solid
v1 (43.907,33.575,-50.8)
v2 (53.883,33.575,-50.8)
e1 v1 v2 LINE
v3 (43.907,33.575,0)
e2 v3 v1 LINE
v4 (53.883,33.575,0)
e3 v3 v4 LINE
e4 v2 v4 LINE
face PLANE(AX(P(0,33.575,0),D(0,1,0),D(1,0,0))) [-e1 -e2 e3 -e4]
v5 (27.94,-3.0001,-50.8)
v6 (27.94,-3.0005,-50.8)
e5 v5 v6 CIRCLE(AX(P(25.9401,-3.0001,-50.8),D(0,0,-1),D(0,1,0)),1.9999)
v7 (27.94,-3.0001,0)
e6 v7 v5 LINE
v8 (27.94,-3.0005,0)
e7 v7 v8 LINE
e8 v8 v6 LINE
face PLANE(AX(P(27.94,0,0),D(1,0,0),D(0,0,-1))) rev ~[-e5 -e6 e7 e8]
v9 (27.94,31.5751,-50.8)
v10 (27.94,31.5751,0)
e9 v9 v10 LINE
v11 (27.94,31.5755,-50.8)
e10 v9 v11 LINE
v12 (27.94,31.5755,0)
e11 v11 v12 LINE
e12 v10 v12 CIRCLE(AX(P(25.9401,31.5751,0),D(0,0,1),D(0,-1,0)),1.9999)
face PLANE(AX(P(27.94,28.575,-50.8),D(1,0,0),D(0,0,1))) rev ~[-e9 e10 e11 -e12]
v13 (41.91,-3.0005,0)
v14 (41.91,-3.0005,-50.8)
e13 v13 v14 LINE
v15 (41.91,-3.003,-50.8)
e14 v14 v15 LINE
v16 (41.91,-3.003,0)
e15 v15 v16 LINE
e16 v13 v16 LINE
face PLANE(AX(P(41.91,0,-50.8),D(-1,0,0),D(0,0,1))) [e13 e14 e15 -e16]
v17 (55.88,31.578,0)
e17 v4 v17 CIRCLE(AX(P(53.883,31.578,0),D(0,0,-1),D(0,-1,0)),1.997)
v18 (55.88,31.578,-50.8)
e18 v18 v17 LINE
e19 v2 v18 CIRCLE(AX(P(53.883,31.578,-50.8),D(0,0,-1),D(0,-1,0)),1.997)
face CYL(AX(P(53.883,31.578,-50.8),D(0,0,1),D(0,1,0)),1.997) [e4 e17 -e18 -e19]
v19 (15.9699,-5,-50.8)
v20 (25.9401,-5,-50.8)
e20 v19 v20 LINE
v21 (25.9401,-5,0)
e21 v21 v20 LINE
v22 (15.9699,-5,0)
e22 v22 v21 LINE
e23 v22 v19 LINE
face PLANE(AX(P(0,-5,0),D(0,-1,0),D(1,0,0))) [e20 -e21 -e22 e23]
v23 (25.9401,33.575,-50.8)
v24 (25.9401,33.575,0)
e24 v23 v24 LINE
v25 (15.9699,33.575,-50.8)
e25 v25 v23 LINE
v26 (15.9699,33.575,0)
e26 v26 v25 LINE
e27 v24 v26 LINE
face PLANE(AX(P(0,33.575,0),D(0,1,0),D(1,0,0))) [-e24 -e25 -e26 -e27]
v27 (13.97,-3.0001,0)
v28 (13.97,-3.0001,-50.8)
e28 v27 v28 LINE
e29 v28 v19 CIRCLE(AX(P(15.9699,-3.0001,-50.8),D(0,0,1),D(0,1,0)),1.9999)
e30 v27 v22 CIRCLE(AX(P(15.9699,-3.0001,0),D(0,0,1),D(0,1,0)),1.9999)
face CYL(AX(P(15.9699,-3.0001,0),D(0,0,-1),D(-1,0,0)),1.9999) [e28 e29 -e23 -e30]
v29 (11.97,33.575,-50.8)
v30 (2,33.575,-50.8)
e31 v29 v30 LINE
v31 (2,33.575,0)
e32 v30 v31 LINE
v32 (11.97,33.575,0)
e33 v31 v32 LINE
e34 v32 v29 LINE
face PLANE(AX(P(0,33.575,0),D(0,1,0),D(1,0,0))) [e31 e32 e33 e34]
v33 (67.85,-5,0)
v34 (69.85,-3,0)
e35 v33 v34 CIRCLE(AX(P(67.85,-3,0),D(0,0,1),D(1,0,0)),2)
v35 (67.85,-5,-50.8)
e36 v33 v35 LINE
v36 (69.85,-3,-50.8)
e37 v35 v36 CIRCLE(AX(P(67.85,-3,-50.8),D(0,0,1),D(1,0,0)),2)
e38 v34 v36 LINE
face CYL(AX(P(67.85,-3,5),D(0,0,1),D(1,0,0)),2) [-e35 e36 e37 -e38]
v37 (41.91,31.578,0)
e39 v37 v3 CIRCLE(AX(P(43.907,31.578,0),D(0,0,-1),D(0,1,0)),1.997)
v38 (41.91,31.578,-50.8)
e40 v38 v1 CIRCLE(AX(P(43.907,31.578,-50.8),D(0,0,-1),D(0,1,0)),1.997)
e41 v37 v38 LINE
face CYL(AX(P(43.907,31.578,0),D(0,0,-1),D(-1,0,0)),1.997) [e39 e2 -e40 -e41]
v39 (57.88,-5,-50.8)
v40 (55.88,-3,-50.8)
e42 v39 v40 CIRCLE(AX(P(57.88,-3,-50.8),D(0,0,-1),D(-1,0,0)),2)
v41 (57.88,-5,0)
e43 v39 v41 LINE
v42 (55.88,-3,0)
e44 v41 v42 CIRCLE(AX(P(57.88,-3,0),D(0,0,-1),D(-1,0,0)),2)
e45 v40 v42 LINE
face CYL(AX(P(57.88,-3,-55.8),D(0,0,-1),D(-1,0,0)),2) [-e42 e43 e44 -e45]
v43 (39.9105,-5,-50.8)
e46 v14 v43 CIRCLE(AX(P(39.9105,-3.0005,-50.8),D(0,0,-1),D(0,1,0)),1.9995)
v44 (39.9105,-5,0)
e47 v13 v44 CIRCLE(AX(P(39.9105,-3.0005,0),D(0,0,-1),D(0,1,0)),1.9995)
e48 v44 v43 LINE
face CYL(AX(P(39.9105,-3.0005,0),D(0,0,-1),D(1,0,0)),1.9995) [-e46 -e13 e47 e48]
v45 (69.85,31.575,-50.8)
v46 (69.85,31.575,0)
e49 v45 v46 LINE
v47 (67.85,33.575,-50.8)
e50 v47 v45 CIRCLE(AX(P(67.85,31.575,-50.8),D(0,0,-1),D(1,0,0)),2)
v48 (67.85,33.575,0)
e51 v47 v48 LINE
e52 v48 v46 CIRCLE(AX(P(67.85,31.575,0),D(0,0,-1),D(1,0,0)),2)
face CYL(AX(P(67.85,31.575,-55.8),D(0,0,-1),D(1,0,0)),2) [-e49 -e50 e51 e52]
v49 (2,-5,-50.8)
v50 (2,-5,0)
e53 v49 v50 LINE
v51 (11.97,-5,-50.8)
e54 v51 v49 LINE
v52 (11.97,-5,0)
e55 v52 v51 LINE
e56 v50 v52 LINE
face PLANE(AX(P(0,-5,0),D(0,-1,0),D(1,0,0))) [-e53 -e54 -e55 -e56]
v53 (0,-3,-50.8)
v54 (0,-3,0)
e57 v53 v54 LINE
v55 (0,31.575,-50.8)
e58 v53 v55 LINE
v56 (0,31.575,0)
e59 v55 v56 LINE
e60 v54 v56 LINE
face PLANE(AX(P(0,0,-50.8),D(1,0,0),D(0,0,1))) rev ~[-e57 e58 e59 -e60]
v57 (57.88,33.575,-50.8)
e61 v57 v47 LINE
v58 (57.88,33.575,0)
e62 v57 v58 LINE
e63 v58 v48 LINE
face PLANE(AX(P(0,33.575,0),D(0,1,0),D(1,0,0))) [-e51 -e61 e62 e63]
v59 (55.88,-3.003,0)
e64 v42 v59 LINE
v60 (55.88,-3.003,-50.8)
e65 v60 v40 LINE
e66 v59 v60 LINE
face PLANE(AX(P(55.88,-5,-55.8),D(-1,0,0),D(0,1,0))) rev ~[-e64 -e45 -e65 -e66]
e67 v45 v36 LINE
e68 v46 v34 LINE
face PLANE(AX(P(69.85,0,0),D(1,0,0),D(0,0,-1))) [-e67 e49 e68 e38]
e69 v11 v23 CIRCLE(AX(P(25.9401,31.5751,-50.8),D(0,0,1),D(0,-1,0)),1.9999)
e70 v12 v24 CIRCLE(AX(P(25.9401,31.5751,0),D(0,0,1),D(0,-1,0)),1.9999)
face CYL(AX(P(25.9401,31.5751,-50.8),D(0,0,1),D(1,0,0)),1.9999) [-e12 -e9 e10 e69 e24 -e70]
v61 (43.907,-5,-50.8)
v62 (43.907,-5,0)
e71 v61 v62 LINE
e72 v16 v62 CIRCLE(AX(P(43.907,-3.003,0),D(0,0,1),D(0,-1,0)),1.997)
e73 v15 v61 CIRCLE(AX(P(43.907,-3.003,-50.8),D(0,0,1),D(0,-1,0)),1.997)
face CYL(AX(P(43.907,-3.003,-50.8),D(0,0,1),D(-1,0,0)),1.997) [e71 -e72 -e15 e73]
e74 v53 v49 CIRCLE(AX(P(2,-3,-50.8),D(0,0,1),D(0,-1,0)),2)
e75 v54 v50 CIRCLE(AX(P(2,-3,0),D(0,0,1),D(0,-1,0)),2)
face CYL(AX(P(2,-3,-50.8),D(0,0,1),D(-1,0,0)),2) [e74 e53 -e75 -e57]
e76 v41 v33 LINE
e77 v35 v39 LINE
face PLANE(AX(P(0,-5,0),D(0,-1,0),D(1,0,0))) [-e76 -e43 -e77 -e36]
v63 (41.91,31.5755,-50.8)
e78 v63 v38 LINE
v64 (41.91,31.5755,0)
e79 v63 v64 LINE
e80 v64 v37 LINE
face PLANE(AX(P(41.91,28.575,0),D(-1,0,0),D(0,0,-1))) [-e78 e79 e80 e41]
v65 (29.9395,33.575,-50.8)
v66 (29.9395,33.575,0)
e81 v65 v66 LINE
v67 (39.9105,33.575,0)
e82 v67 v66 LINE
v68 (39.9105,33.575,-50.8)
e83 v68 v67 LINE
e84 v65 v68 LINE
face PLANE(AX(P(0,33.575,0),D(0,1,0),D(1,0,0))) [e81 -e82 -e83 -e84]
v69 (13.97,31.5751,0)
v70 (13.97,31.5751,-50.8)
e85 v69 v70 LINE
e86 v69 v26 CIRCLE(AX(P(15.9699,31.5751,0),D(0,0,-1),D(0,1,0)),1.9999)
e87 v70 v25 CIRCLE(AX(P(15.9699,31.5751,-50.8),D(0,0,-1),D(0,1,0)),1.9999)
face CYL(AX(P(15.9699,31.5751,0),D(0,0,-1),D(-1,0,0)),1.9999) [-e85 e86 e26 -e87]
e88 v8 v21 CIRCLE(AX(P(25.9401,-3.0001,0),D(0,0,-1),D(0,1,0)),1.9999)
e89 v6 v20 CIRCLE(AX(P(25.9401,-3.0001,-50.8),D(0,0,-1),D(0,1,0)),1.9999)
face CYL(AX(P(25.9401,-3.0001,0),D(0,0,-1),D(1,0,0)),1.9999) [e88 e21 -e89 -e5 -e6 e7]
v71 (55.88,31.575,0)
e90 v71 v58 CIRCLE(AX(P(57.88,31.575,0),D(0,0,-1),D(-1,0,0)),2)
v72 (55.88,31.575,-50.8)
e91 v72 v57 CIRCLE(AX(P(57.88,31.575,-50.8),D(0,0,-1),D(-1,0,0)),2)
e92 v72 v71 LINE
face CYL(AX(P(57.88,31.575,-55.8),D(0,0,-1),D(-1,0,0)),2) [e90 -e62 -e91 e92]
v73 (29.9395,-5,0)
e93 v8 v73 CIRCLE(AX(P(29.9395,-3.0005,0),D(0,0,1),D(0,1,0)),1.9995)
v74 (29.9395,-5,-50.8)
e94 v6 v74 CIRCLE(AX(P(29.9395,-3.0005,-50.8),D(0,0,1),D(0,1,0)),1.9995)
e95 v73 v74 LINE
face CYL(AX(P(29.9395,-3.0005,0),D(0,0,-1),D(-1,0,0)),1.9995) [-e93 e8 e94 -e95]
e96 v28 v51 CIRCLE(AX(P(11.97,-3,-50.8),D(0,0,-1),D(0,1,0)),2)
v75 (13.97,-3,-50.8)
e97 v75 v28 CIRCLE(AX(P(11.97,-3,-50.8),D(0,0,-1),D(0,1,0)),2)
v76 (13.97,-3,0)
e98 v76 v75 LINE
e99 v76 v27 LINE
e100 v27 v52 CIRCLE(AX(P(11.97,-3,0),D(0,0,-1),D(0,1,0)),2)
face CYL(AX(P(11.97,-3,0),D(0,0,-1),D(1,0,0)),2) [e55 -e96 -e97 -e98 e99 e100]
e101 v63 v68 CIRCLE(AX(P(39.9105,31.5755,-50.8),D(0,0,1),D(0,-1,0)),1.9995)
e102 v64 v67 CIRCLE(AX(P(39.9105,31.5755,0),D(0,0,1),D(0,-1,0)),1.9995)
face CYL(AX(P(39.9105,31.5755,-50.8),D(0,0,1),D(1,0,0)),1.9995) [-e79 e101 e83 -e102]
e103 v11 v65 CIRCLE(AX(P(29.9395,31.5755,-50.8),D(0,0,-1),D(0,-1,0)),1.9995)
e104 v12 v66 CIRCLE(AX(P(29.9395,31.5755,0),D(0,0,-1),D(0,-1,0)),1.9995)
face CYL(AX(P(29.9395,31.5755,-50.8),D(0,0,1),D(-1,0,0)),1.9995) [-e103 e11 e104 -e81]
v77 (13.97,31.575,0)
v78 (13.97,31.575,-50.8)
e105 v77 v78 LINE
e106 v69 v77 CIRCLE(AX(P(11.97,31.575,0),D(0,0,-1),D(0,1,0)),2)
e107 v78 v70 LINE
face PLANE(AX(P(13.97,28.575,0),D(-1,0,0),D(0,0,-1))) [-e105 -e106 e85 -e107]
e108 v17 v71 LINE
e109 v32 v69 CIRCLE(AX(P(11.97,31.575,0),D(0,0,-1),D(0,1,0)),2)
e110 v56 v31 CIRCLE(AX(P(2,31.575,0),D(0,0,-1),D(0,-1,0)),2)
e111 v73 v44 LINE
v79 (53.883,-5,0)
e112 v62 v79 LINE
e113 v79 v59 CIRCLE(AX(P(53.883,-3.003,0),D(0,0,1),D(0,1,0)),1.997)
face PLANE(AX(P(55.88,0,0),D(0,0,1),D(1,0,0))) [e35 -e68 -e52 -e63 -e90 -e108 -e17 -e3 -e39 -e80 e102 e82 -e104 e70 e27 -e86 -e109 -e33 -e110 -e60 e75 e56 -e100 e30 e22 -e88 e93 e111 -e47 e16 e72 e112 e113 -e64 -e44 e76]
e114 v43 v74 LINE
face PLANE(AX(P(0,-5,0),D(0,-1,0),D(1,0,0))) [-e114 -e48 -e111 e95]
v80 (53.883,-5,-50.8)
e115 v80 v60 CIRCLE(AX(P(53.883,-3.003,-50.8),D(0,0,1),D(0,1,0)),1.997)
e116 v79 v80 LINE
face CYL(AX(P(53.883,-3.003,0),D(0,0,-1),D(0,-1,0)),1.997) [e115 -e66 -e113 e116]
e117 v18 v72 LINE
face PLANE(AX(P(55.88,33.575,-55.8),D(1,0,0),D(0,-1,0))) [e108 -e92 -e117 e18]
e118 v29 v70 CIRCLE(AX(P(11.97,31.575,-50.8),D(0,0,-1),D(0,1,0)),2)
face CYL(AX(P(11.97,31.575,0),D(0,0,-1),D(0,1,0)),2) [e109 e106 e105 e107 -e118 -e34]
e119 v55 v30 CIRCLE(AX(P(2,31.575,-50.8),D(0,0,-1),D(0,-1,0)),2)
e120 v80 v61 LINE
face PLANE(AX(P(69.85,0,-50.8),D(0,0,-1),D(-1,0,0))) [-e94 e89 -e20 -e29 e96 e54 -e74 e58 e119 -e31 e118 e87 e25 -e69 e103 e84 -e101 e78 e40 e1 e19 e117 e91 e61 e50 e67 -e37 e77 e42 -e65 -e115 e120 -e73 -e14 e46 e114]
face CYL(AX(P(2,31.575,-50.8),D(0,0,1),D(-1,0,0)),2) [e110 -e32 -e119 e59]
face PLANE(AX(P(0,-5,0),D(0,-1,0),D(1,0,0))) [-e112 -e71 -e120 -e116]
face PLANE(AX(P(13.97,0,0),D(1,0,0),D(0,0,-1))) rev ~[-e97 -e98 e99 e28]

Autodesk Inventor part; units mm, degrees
ref_plane "YZ Plane" through (0, 0, 0) normal (1, 0, 0) x (0, 1, 0)
ref_plane "XZ Plane" through (0, 0, 0) normal (0, 1, 0) x (-1, 0, 0)
ref_plane "XY Plane" through (0, 0, 0) normal (0, 0, 1) x (1, 0, 0)
sketch "Sketch1" plane through (0, 0, 0) normal (0, 1, 0) x (-1, 0, 0)
  line L0 (0, 0) -> (-69.85, 0)
  line L1 (-69.85, 0) -> (-69.85, -50.8)
  line L2 (-69.85, -50.8) -> (0, -50.8)
  line L3 (0, -50.8) -> (0, 0)
  dimension "d0" = 50.8
  dimension "d1" = 69.85
extrude "Extrusion1" add sketch "Sketch1" along normal blind 28.575
sketch "Sketch2" plane through (0, 28.575, 0) normal (0, 1, 0) x (1, 0, 0)
  line L0 (0, 0) -> (69.85, 0) projected
  line L1 (13.97, 0) -> (13.97, 50.8)
  line L2 (69.85, 50.8) -> (0, 50.8) projected
  line L3 (27.94, 50.8) -> (27.94, 0)
  line L4 (55.88, 50.8) -> (55.88, 0)
  line L5 (41.91, 50.8) -> (41.91, 0)
  line L6 (0, 50.8) -> (0, 0) projected
  dimension "d4" = 13.97
  dimension "d5" = 13.97
  dimension "d6" = 13.97
  dimension "d7" = 13.97
sketch "Sketch3" plane through (0, 28.575, 0) normal (0, 1, 0) x (1, 0, 0)
  line L0 (69.85, 50.8) -> (0, 50.8) projected
  line L1 (0, 0) -> (69.85, 0) projected
  line L2 (0, 50.8) -> (13.97, 50.8)
  line L3 (13.97, 50.8) -> (13.97, 0)
  line L4 (13.97, 0) -> (0, 0)
  line L5 (0, 0) -> (0, 50.8)
  dimension "d8" = 50.8
  dimension "d9" = 13.97
extrude "Extrusion2" add sketch "Sketch2" along normal blind 5 contours L6 L2 L1 L0
sketch "Sketch4" plane through (0, 0, -50.8) normal (-1, 0, 0) x (0, 0, 1)
  line L0 (0, 0) -> (0, 33.575) projected
  line L1 (50.8, 0) -> (50.8, 33.575) projected
  line L2 (0, 33.575) -> (50.8, 33.575)
  line L3 (50.8, 33.575) -> (50.8, 28.5663)
  line L4 (50.8, 28.5663) -> (0, 28.5663)
  line L5 (0, 28.5663) -> (0, 33.575)
fillet "Fillet1" radius 2 2 edges at (0, 33.575, -25.4) (13.97, 33.575, -25.4)
sketch "Sketch5" plane through (0, 28.575, 0) normal (0, 1, 0) x (1, 0, 0)
  line L0 (13.97, 50.8) -> (27.94, 50.8)
  line L1 (27.94, 50.8) -> (27.94, 0)
  line L2 (27.94, 0) -> (13.97, 0)
  line L3 (13.97, 0) -> (13.97, 50.8)
  point P0 (0, 0)
  dimension "d13" = 13.97
extrude "Extrusion3" add sketch "Sketch5" along normal blind 5
fillet "Fillet2" radius 2 2 edges at (13.97, 33.575, -25.4) (27.94, 33.575, -25.4)
sketch "Sketch6" plane through (0, 28.575, 0) normal (0, 1, 0) x (1, 0, 0)
  line L0 (27.94, 50.8) -> (27.94, 0) projected
  line L1 (27.94, 50.8) -> (41.91, 50.8)
  line L2 (41.91, 50.8) -> (41.91, 0)
  line L3 (41.91, 0) -> (27.94, 0)
  line L4 (27.94, 0) -> (27.94, 50.8)
  point P0 (0, 0)
  dimension "d17" = 13.97
extrude "Extrusion4" add sketch "Sketch6" along normal blind 5
fillet "Fillet3" radius 2 2 edges at (27.94, 33.575, -25.4) (41.91, 33.575, -25.4)
sketch "Sketch7" plane through (0, 28.575, 0) normal (0, 1, 0) x (1, 0, 0)
  line L0 (41.91, 0) -> (41.91, 50.8) projected
  line L1 (41.91, 0) -> (69.85, 0) projected
  line L2 (41.91, 50.8) -> (55.88, 50.8)
  line L3 (55.88, 50.8) -> (55.88, 0)
  line L4 (55.88, 0) -> (41.91, 0)
  line L5 (41.91, 0) -> (41.91, 50.8)
  point P0 (0, 0)
extrude "Extrusion5" add sketch "Sketch7" along normal blind 5
fillet "Fillet4" radius 2 2 edges at (41.91, 33.575, -25.4) (55.88, 33.575, -25.4)
sketch "Sketch8" plane through (0, 28.575, 0) normal (0, 1, 0) x (1, 0, 0)
  line L0 (55.88, 50.8) -> (55.88, 0) projected
  line L1 (55.88, 0) -> (69.85, 0) projected
  line L2 (55.88, 50.8) -> (69.85, 50.8)
  line L3 (69.85, 50.8) -> (69.85, 0)
  line L4 (69.85, 0) -> (55.88, 0)
  line L5 (55.88, 0) -> (55.88, 50.8)
  point P0 (0, 0)
extrude "Extrusion6" add sketch "Sketch8" along normal blind 5
fillet "Fillet5" radius 2 2 edges at (55.88, 33.575, -25.4) (69.85, 33.575, -25.4)
sketch "Sketch9" plane through (0, 0, 0) normal (0, -1, 0) x (1, 0, 0)
  point P0 (0, 0)
sketch "Sketch10" plane through (0, 0, 0) normal (0, -1, 0) x (1, 0, 0)
  line L0 (69.85, -50.8) -> (0, -50.8) projected
  line L1 (0, 0) -> (13.97, 0)
  line L2 (13.97, 0) -> (13.97, -50.8)
  line L3 (13.97, -50.8) -> (0, -50.8)
  line L4 (0, -50.8) -> (0, 0)
  dimension "d27" = 13.97
extrude "Extrusion7" add sketch "Sketch10" along normal blind 5
fillet "Fillet6" radius 2 2 edges at (0, -5, -25.4) (13.97, -5, -25.4)
sketch "Sketch11" plane through (0, 0, 0) normal (0, -1, 0) x (1, 0, 0)
  line L0 (13.97, 0) -> (13.97, -50.8) projected
  line L1 (27.94, -50.8) -> (25.94, -50.8) projected
  line L2 (13.97, 0) -> (27.94, 0)
  line L3 (27.94, 0) -> (27.94, -50.8)
  line L4 (27.94, -50.8) -> (13.97, -50.8)
  line L5 (13.97, -50.8) -> (13.97, 0)
  point P0 (0, 0)
extrude "Extrusion8" add sketch "Sketch11" along normal blind 5
fillet "Fillet7" radius 2 2 edges at (13.97, -5, -25.4) (27.94, -5, -25.4)
sketch "Sketch12" plane through (0, 0, 0) normal (0, -1, 0) x (1, 0, 0)
  line L0 (27.94, 0) -> (27.94, -50.8) projected
  line L1 (41.91, 0) -> (41.91, -50.8) projected
  line L2 (27.94, 0) -> (41.91, 0)
  line L3 (41.91, 0) -> (41.91, -50.8)
  line L4 (41.91, -50.8) -> (27.94, -50.8)
  line L5 (27.94, -50.8) -> (27.94, 0)
  point P0 (0, 0)
extrude "Extrusion9" add sketch "Sketch12" along normal blind 5
fillet "Fillet8" radius 2 2 edges at (27.94, -5, -25.4) (41.91, -5, -25.4)
sketch "Sketch13" plane through (0, 0, 0) normal (0, -1, 0) x (1, 0, 0)
  line L0 (41.91, -50.8) -> (41.91, 0) projected
  line L1 (69.85, -50.8) -> (41.91, -50.8) projected
  line L2 (41.91, 0) -> (55.88, 0)
  line L3 (55.88, 0) -> (55.88, -50.8)
  line L4 (55.88, -50.8) -> (41.91, -50.8)
  line L5 (41.91, -50.8) -> (41.91, 0)
  point P0 (0, 0)
extrude "Extrusion10" add sketch "Sketch13" along normal blind 5
fillet "Fillet9" radius 2 2 edges at (55.88, -5, -25.4) (41.91, -5, -25.4)
sketch "Sketch14" plane through (0, 0, 0) normal (0, -1, 0) x (1, 0, 0)
  line L0 (53.88, 0) -> (55.88, 0) projected
  line L1 (69.85, -50.8) -> (55.88, -50.8) projected
  line L2 (55.88, 0) -> (69.85, 0)
  line L3 (69.85, 0) -> (69.85, -50.8)
  line L4 (69.85, -50.8) -> (55.88, -50.8)
  line L5 (55.88, -50.8) -> (55.88, 0)
  point P0 (0, 0)
extrude "Extrusion11" add sketch "Sketch14" along normal blind 5
fillet "Fillet10" radius 2 2 edges at (55.88, -5, -25.4) (69.85, -5, -25.4)
properties part number "Simplistic_battery_pack-spencermical"
